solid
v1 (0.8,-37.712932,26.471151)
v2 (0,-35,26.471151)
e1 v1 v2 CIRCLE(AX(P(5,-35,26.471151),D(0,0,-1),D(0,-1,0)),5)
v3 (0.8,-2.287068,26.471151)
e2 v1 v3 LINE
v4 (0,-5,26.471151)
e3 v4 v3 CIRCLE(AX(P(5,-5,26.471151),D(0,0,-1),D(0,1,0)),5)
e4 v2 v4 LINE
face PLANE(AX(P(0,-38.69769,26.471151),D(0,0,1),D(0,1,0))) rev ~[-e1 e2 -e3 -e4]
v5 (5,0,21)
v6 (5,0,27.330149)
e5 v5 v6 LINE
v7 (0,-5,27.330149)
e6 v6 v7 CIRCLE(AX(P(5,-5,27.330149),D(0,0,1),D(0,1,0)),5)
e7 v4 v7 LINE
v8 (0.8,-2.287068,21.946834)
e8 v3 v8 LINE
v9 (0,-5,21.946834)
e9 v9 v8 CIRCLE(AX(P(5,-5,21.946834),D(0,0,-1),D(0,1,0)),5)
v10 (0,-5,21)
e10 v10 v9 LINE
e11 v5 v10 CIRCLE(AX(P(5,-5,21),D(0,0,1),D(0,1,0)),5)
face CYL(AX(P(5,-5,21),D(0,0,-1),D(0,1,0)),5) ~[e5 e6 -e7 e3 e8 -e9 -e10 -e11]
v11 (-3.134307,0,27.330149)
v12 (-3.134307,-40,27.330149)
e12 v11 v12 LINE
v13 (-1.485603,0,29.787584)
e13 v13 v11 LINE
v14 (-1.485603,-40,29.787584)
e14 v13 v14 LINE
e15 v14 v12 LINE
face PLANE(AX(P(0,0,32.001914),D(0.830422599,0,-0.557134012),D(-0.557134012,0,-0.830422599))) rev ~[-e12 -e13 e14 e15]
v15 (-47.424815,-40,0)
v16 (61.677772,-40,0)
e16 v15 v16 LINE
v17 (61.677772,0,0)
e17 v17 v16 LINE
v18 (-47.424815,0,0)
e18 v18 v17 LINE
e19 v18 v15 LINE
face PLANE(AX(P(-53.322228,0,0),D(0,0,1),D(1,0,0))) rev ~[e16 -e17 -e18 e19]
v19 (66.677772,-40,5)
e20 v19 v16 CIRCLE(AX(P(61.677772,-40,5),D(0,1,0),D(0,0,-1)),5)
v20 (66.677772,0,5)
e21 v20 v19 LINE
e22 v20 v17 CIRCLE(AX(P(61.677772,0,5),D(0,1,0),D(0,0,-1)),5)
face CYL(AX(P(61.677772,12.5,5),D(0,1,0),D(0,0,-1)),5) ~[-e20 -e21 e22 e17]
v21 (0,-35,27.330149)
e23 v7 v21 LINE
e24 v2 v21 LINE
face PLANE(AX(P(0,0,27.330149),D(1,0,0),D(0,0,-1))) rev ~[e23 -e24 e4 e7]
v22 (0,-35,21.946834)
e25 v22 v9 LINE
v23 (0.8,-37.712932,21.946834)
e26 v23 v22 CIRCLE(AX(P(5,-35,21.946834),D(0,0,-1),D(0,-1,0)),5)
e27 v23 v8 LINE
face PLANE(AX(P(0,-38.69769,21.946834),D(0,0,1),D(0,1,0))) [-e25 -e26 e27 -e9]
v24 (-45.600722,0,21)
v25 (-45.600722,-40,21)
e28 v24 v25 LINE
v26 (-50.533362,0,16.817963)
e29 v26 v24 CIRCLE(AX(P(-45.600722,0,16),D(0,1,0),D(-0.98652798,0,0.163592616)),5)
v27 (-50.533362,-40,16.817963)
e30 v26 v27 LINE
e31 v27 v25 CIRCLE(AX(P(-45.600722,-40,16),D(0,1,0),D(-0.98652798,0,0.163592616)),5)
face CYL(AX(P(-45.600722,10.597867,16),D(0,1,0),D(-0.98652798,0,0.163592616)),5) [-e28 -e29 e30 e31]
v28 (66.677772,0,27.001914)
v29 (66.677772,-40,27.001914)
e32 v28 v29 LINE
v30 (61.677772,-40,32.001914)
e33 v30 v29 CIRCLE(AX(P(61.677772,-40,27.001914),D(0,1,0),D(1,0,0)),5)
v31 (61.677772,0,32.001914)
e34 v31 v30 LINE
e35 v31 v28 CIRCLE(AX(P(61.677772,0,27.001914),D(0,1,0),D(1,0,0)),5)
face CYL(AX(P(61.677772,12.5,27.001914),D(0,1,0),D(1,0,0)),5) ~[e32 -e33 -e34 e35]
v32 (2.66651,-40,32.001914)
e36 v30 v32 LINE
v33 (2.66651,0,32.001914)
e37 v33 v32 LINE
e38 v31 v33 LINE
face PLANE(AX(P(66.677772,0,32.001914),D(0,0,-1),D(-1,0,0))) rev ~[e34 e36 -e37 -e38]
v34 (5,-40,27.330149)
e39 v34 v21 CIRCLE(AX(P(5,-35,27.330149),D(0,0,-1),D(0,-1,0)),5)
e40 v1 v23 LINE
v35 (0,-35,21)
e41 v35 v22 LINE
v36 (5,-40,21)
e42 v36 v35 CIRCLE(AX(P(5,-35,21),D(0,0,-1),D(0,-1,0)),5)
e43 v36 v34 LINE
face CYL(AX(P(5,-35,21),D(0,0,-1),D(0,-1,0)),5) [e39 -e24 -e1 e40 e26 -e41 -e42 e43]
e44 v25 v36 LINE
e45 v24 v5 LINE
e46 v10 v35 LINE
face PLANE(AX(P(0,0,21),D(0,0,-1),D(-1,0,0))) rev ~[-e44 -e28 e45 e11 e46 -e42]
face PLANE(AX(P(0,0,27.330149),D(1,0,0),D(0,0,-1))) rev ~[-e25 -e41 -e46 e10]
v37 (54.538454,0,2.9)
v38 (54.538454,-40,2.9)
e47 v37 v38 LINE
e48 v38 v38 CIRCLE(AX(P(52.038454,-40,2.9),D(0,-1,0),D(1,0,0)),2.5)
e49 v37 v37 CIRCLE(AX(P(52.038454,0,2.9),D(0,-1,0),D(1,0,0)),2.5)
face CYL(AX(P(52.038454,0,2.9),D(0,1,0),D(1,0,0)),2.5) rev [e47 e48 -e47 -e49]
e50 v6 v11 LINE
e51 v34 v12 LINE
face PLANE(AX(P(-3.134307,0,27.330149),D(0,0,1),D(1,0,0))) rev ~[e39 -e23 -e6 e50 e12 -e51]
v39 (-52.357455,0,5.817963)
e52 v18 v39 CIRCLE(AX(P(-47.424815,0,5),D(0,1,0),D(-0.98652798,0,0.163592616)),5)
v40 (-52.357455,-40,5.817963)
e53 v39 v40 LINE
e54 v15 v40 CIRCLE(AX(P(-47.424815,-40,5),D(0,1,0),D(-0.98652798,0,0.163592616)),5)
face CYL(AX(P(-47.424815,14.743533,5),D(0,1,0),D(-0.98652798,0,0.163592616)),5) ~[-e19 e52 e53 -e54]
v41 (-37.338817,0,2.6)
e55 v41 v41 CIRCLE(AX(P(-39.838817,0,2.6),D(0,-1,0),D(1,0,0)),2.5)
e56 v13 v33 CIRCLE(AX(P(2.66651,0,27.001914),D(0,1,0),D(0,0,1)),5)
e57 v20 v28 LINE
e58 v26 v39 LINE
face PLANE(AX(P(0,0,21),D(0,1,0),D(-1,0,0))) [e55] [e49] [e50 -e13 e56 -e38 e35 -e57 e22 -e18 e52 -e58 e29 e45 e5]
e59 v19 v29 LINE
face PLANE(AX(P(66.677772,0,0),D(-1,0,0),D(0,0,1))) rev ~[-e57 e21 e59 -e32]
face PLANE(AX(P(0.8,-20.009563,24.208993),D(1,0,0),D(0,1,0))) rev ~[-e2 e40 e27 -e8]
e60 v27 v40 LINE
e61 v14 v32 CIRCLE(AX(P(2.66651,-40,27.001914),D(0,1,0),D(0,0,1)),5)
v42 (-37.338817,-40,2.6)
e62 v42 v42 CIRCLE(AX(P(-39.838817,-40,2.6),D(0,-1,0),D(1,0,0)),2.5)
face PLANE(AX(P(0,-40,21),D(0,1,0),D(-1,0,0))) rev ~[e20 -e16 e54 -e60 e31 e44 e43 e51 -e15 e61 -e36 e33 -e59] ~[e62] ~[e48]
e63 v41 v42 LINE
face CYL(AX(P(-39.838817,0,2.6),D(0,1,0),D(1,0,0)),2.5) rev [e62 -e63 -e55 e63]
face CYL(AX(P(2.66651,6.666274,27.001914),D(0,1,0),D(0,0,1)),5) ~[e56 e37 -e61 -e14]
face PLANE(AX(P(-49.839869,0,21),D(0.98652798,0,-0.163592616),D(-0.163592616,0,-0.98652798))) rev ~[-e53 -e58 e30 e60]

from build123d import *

# Parameters (mm, degrees)
F0_R        = 2.5
F0_W        = 4.0654889308
F0_H        = 4.077391699
F1_DEPTH    = 40
F2_DEPTH    = 0.1
F3_W        = 37.3762528179
F3_H        = 4.5243166387
F4_DEPTH    = 0.8
F5_T1_DEPTH = 61.1957339443
F5_T3_DEPTH = 69.4870657294
F5_T5_DEPTH = 6.3301489651
F5_T7_DEPTH = 53.3325486423
F5_T9_DEPTH = 65


# Not quite as in the source:
# - a fillet or chamfer that OpenCascade refuses, or shapes differently, is made with other operations: its cross-section is extruded or revolved along the edge and cut away or added


with BuildPart() as f1:
    # F0 (on Front) → F1 (new body)
    with BuildSketch(Plane.XZ):
        Polygon((-49.8398691416, 21), (-53.3222284913, 0), (0, 0), (26.6024060547, 0), (66.6777715087, 0), (66.6777715087, 32.0019141734), (0, 32.0019141734), (0, 27.3301489651), (0, 26.5009570867), (4.0654889308, 26.5009570867), (4.0654889308, 22.4235653877), (0, 22.4235653877), (0, 21), align=None)
        with Locations((-39.8388169706, 2.6)):
            Circle(F0_R, mode=Mode.SUBTRACT)
        with Locations((52.0384535193, 2.9)):
            Circle(F0_R, mode=Mode.SUBTRACT)
        with Locations((2.0327444654, 24.4622612372)):
            Rectangle(F0_W, F0_H)
        Polygon((0, 27.3301489651), (0, 32.0019141734), (-3.1343069183, 27.3301489651), align=None)
    extrude(amount=F1_DEPTH)

    # F2 (add): a face of the model
    f2_faces = [f1.faces().sort_by_distance(p)[0] for p in [
        (-24.9199345708, -20, 21),
    ]]
    extrude(f2_faces, amount=-F2_DEPTH)

    # F3 (on Right) → F4 (cut)
    with BuildSketch(Plane.YZ):
        with Locations((-20.0095633627, 24.2089927197)):
            Rectangle(F3_W, F3_H)
    extrude(amount=F4_DEPTH, mode=Mode.SUBTRACT)

    # F5: fillet of radius 5 on 7 edges, made by hand

    # F5_s2 → F5_t1 (cut)
    with BuildSketch(Plane.XZ.offset(-10.5978669722)):
        with BuildLine():
            ThreePointArc((-50.5333622544, 16.81796308), (-48.8341558683, 19.8137786643), (-45.6007223527, 21))
            Line((-45.6007223527, 21), (-49.8398691416, 21))
            Line((-49.8398691416, 21), (-50.5333622544, 16.81796308))
        make_face()
    extrude(amount=F5_T1_DEPTH, mode=Mode.SUBTRACT)

    # F5_s4 → F5_t3 (cut)
    with BuildSketch(Plane.XZ.offset(-14.7435328647)):
        with BuildLine():
            ThreePointArc((-52.3574552471, 5.81796308), (-51.2385940097, 1.7665664844), (-47.4248153454, 0))
            Line((-47.4248153454, 0), (-53.3222284913, 0))
            Line((-53.3222284913, 0), (-52.3574552471, 5.81796308))
        make_face()
    extrude(amount=F5_T3_DEPTH, mode=Mode.SUBTRACT)

    # F5_s6 → F5_t5 (cut)
    with BuildSketch(Plane.XY.offset(21)):
        with BuildLine():
            ThreePointArc((5, 0), (1.4644660941, -1.4644660941), (0, -5))
            Line((0, -5), (0, 0))
            Line((0, 0), (5, 0))
        make_face()
        with BuildLine():
            ThreePointArc((5, -40), (1.4644660941, -38.5355339059), (0, -35))
            Line((0, -35), (0, -40))
            Line((0, -40), (5, -40))
        make_face()
    extrude(amount=F5_T5_DEPTH, mode=Mode.SUBTRACT)

    # F5_s8 → F5_t7 (cut)
    with BuildSketch(Plane.XZ.offset(-6.6662743212)):
        with BuildLine():
            ThreePointArc((2.6665097285, 32.0019141734), (0.3136763633, 31.4137363769), (-1.4856032643, 29.7875842356))
            Line((-1.4856032643, 29.7875842356), (0, 32.0019141734))
            Line((0, 32.0019141734), (2.6665097285, 32.0019141734))
        make_face()
    extrude(amount=F5_T7_DEPTH, mode=Mode.SUBTRACT)

    # F5_s10 → F5_t9 (cut)
    with BuildSketch(Plane.XZ.offset(-12.5)):
        with BuildLine():
            ThreePointArc((61.6777715087, 0), (65.2133054146, 1.4644660941), (66.6777715087, 5))
            Line((66.6777715087, 5), (66.6777715087, 0))
            Line((66.6777715087, 0), (61.6777715087, 0))
        make_face()
        with BuildLine():
            ThreePointArc((66.6777715087, 27.0019141734), (65.2133054146, 30.5374480793), (61.6777715087, 32.0019141734))
            Line((61.6777715087, 32.0019141734), (66.6777715087, 32.0019141734))
            Line((66.6777715087, 32.0019141734), (66.6777715087, 27.0019141734))
        make_face()
    extrude(amount=F5_T9_DEPTH, mode=Mode.SUBTRACT)


solid = f1.part
